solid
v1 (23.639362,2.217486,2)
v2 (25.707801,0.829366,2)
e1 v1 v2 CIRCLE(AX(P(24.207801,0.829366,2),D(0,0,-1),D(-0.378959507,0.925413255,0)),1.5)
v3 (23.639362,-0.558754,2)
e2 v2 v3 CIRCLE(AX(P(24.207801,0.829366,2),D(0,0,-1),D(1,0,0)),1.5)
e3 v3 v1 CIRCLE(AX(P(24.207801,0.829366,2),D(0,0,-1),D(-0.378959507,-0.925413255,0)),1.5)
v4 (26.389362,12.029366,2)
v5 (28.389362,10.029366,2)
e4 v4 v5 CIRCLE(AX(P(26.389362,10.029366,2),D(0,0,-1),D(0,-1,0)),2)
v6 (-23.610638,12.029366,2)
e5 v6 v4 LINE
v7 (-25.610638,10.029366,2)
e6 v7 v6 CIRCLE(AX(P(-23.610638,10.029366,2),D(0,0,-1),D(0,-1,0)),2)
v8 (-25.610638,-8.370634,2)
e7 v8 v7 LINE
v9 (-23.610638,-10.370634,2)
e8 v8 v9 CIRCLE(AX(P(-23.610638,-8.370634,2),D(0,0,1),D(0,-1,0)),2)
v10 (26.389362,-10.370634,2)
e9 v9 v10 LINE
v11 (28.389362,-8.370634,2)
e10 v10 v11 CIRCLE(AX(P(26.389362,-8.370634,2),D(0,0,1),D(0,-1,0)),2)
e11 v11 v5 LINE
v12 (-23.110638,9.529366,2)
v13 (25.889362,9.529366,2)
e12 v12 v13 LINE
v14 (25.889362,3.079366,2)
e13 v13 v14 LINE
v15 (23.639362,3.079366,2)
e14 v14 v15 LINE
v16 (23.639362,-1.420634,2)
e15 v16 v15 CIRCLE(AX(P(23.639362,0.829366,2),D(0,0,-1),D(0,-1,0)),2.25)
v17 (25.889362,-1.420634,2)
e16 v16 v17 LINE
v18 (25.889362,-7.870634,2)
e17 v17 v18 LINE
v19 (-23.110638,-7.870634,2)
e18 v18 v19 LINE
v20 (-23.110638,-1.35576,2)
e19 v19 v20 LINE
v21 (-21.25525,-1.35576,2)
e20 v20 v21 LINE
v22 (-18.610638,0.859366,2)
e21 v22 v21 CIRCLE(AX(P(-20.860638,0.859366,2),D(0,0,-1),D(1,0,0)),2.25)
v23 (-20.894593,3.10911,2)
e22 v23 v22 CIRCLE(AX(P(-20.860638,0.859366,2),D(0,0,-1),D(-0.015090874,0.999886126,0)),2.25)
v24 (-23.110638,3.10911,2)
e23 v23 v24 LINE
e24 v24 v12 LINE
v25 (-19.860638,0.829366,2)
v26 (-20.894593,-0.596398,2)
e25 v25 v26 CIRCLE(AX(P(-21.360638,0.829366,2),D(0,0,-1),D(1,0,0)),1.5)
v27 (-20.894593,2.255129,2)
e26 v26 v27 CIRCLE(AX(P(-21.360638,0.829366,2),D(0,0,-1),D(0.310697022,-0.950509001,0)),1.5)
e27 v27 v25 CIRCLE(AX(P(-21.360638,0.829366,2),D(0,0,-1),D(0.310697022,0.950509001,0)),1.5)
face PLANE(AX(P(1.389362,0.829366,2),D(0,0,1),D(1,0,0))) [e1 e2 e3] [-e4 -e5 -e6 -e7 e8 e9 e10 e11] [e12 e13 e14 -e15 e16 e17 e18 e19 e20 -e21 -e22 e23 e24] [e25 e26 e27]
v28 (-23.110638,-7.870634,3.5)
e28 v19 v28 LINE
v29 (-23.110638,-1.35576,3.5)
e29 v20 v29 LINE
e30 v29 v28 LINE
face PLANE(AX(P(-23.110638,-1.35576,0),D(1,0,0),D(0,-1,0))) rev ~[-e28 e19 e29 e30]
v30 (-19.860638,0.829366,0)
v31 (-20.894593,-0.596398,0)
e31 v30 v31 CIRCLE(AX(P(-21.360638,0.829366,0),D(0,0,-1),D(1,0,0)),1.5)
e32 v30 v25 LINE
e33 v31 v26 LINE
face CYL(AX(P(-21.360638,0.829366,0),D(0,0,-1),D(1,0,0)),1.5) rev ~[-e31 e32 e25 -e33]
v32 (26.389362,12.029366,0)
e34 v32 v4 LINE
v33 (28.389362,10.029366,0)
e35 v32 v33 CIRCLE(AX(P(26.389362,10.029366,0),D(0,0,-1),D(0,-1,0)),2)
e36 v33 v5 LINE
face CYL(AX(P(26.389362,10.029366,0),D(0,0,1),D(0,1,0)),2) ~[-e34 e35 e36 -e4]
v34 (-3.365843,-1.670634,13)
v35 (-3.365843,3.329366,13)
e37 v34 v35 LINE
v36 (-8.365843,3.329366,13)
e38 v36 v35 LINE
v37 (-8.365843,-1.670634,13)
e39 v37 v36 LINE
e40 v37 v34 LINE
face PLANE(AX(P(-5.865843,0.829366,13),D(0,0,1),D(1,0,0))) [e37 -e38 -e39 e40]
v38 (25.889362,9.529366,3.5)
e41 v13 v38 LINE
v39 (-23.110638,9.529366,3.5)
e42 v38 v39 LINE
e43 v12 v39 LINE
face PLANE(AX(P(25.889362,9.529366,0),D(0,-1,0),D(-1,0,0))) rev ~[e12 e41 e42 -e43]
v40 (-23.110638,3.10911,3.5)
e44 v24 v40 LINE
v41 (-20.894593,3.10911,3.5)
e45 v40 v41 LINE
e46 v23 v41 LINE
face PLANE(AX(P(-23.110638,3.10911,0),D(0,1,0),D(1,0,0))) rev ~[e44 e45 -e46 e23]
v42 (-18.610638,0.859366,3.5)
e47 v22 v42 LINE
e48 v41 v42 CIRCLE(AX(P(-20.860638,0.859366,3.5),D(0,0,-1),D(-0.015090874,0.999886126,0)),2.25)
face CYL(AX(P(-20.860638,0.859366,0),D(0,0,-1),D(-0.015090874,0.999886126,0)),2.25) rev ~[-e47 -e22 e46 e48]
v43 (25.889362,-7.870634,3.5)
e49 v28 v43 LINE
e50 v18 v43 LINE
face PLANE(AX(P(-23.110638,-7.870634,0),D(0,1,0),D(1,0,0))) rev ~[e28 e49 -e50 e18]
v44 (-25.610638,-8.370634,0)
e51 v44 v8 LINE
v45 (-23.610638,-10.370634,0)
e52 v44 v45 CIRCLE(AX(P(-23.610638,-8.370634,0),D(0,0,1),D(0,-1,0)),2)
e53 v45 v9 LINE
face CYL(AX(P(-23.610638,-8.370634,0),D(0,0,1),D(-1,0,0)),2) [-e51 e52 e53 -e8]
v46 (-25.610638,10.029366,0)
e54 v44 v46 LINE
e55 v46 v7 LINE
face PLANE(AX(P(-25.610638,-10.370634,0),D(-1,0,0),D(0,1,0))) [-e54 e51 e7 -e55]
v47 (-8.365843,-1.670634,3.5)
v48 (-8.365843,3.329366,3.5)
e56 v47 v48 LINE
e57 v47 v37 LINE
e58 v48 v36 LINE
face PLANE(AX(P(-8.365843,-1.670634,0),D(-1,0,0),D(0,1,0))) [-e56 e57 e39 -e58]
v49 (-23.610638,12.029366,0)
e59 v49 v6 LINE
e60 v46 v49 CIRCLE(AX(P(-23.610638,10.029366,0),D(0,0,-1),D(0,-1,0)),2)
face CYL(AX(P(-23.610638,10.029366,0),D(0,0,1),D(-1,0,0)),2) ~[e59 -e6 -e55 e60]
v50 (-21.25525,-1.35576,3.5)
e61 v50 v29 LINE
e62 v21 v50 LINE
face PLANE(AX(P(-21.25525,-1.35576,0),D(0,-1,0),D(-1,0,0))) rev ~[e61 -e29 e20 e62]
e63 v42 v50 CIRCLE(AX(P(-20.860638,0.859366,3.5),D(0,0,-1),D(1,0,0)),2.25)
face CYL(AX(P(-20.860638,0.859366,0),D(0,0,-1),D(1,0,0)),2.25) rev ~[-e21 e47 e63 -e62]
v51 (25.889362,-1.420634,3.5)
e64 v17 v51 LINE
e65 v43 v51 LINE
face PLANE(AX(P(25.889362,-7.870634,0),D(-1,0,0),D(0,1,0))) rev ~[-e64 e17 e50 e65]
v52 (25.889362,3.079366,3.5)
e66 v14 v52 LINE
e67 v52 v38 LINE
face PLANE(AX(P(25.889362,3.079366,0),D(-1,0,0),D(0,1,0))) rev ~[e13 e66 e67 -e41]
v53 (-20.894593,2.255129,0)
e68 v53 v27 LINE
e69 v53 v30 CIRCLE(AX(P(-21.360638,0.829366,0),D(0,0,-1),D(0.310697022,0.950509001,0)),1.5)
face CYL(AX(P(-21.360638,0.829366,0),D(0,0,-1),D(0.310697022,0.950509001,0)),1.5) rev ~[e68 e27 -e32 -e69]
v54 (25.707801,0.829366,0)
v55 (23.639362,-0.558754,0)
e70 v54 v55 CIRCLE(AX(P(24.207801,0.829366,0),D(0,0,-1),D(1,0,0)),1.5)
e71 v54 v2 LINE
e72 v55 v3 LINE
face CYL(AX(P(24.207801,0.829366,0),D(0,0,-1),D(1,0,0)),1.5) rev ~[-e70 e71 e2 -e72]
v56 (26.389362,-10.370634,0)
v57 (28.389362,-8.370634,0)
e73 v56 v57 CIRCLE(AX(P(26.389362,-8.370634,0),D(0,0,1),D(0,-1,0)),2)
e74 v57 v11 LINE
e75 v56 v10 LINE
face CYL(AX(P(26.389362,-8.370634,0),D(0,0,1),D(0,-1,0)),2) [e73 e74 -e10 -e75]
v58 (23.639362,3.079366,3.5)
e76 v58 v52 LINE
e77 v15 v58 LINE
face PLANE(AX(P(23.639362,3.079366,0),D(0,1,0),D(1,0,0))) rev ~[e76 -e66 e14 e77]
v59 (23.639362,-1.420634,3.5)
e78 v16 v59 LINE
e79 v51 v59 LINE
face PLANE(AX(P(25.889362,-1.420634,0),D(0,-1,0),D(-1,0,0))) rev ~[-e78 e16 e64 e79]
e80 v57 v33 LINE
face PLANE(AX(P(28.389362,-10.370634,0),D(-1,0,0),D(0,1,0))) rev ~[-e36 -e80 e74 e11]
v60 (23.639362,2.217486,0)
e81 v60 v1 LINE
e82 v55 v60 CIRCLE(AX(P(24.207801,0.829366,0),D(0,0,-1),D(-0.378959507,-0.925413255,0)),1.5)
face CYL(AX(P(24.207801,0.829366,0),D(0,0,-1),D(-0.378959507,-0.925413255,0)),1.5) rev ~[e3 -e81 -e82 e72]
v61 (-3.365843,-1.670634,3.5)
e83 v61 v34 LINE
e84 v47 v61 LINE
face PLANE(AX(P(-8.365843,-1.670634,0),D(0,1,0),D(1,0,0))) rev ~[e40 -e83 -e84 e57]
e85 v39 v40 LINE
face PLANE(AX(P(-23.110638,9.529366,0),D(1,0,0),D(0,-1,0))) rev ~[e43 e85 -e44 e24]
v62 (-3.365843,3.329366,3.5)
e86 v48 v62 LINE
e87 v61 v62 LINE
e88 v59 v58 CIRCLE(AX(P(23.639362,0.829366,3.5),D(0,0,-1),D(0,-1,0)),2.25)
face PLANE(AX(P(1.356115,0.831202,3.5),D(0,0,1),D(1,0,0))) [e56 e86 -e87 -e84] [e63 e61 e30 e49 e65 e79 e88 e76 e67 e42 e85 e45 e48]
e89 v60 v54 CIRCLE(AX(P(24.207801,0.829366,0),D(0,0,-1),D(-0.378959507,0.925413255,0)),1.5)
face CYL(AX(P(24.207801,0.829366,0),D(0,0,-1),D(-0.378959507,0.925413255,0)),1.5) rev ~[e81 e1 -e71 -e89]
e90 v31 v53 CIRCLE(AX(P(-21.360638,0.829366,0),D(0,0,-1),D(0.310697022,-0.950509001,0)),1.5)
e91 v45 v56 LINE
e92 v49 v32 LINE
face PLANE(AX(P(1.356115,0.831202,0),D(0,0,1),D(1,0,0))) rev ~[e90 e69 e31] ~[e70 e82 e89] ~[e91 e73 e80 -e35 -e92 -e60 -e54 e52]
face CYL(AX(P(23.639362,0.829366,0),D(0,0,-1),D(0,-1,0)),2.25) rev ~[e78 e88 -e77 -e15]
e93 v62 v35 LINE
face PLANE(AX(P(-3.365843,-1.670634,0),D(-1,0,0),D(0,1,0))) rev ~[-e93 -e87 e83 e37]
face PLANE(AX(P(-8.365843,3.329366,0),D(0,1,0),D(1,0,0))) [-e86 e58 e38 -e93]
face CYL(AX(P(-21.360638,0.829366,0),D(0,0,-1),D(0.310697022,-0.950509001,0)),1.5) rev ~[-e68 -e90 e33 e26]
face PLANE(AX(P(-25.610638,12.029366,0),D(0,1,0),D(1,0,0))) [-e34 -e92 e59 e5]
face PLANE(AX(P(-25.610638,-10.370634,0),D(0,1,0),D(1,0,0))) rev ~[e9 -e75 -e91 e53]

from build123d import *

# Parameters (mm, degrees)
F0_W     = 54
F0_H     = 22.4
F0_W_2   = 5
F0_H_2   = 5
F1_DEPTH = 2
F2_DEPTH = 13
F3_DEPTH = 3.5
F4_R     = 2


# Not quite as in the source:
# - a feature names something its author has since deleted; it is built from what else it names


with BuildPart() as f1:
    # F0 (on Top) → F1 (new body)
    with BuildSketch(Plane.XY):
        with Locations((1.3893617413, 0.829365923)):
            Rectangle(F0_W, F0_H)
        Polygon((-23.1106382587, 3.1091097071), (-23.1106382587, 9.529365923), (25.8893617413, 9.529365923), (25.8893617413, 3.079365923), (25.8893617413, 0.829365923), (25.8893617413, -1.420634077), (25.8893617413, -7.870634077), (-23.1106382587, -7.870634077), (-23.1106382587, -1.3557597995), (-23.1106382587, 0.859365923), align=None, mode=Mode.SUBTRACT)
        with BuildLine():
            Line((25.8893617413, 9.529365923), (-23.1106382587, 9.529365923))
            Line((-23.1106382587, 9.529365923), (-23.1106382587, 3.1091097071))
            Line((-23.1106382587, 3.1091097071), (-20.8945927259, 3.1091097071))
            ThreePointArc((-20.8945927259, 3.1091097071), (-19.2816983534, 2.4623159458), (-18.6106382587, 0.859365923))
            ThreePointArc((-18.6106382587, 0.859365923), (-19.4158848712, -0.8655073041), (-21.2552495026, -1.3557597995))
            Line((-21.2552495026, -1.3557597995), (-23.1106382587, -1.3557597995))
            Line((-23.1106382587, -1.3557597995), (-23.1106382587, -7.870634077))
            Line((-23.1106382587, -7.870634077), (25.8893617413, -7.870634077))
            Line((25.8893617413, -7.870634077), (25.8893617413, -1.420634077))
            Line((25.8893617413, -1.420634077), (23.6393617413, -1.420634077))
            ThreePointArc((23.6393617413, -1.420634077), (21.3893617413, 0.829365923), (23.6393617413, 3.079365923))
            Line((23.6393617413, 3.079365923), (25.8893617413, 3.079365923))
            Line((25.8893617413, 3.079365923), (25.8893617413, 9.529365923))
        make_face()
        with Locations((-5.8658428788, 0.829365923)):
            Rectangle(F0_W_2, F0_H_2, mode=Mode.SUBTRACT)
        with BuildLine():
            Line((-20.8945927259, 3.1091097071), (-23.1106382587, 3.1091097071))
            Line((-23.1106382587, 3.1091097071), (-23.1106382587, 0.859365923))
            ThreePointArc((-23.1106382587, 0.859365923), (-22.4635882815, 2.4383058282), (-20.8945927259, 3.1091097071))
        make_face()
        with BuildLine():
            Line((25.8893617413, 0.829365923), (25.8893617413, 3.079365923))
            Line((25.8893617413, 3.079365923), (23.6393617413, 3.079365923))
            ThreePointArc((23.6393617413, 3.079365923), (25.230351999, 2.4203561806), (25.8893617413, 0.829365923))
        make_face()
        with BuildLine():
            ThreePointArc((-21.2552495026, -1.3557597995), (-22.5855114857, -0.5853874645), (-23.1106382587, 0.859365923))
            Line((-23.1106382587, 0.859365923), (-23.1106382587, -1.3557597995))
            Line((-23.1106382587, -1.3557597995), (-21.2552495026, -1.3557597995))
        make_face()
        with BuildLine():
            ThreePointArc((-20.8945927259, 3.1091097071), (-22.4635882815, 2.4383058282), (-23.1106382587, 0.859365923))
            ThreePointArc((-23.1106382587, 0.859365923), (-22.5855114857, -0.5853874645), (-21.2552495026, -1.3557597995))
            Line((-21.2552495026, -1.3557597995), (-20.8945927259, -1.3557597995))
            Line((-20.8945927259, -1.3557597995), (-20.8945927259, -0.5963975782))
            ThreePointArc((-20.8945927259, -0.5963975782), (-22.8606382587, 0.829365923), (-20.8945927259, 2.2551294242))
            Line((-20.8945927259, 2.2551294242), (-20.8945927259, 3.1091097071))
        make_face()
        with BuildLine():
            ThreePointArc((-18.6106382587, 0.859365923), (-19.2816983534, 2.4623159458), (-20.8945927259, 3.1091097071))
            Line((-20.8945927259, 3.1091097071), (-20.8945927259, 2.2551294242))
            ThreePointArc((-20.8945927259, 2.2551294242), (-20.1463342813, 1.7099713115), (-19.8606382587, 0.829365923))
            ThreePointArc((-19.8606382587, 0.829365923), (-20.1463342813, -0.0512394656), (-20.8945927259, -0.5963975782))
            Line((-20.8945927259, -0.5963975782), (-20.8945927259, -1.3557597995))
            Line((-20.8945927259, -1.3557597995), (-21.2552495026, -1.3557597995))
            ThreePointArc((-21.2552495026, -1.3557597995), (-19.4158848712, -0.8655073041), (-18.6106382587, 0.859365923))
        make_face()
        with BuildLine():
            ThreePointArc((23.6393617413, -1.420634077), (25.230351999, -0.7616243347), (25.8893617413, 0.829365923))
            ThreePointArc((25.8893617413, 0.829365923), (25.230351999, 2.4203561806), (23.6393617413, 3.079365923))
            Line((23.6393617413, 3.079365923), (23.6393617413, 2.2174858052))
            ThreePointArc((23.6393617413, 2.2174858052), (25.043666155, 2.0748896863), (25.7078010014, 0.829365923))
            ThreePointArc((25.7078010014, 0.829365923), (25.043666155, -0.4161578404), (23.6393617413, -0.5587539593))
            Line((23.6393617413, -0.5587539593), (23.6393617413, -1.420634077))
        make_face()
        with BuildLine():
            Line((25.8893617413, -1.420634077), (25.8893617413, 0.829365923))
            ThreePointArc((25.8893617413, 0.829365923), (25.230351999, -0.7616243347), (23.6393617413, -1.420634077))
            Line((23.6393617413, -1.420634077), (25.8893617413, -1.420634077))
        make_face()
        with BuildLine():
            Line((23.6393617413, 2.2174858052), (23.6393617413, 3.079365923))
            ThreePointArc((23.6393617413, 3.079365923), (21.3893617413, 0.829365923), (23.6393617413, -1.420634077))
            Line((23.6393617413, -1.420634077), (23.6393617413, -0.5587539593))
            ThreePointArc((23.6393617413, -0.5587539593), (22.7078010014, 0.829365923), (23.6393617413, 2.2174858052))
        make_face()
        with Locations((-5.8658428788, 0.829365923)):
            Rectangle(F0_W_2, F0_H_2)
    extrude(amount=F1_DEPTH)

    # F0 (on Top) → F2 (join)
    with BuildSketch(Plane.XY):
        with Locations((-5.8658428788, 0.829365923)):
            Rectangle(F0_W_2, F0_H_2)
    extrude(amount=F2_DEPTH)

    # F0 (on Top) → F3 (join)
    with BuildSketch(Plane.XY):
        with BuildLine():
            Line((25.8893617413, 9.529365923), (-23.1106382587, 9.529365923))
            Line((-23.1106382587, 9.529365923), (-23.1106382587, 3.1091097071))
            Line((-23.1106382587, 3.1091097071), (-20.8945927259, 3.1091097071))
            ThreePointArc((-20.8945927259, 3.1091097071), (-19.2816983534, 2.4623159458), (-18.6106382587, 0.859365923))
            ThreePointArc((-18.6106382587, 0.859365923), (-19.4158848712, -0.8655073041), (-21.2552495026, -1.3557597995))
            Line((-21.2552495026, -1.3557597995), (-23.1106382587, -1.3557597995))
            Line((-23.1106382587, -1.3557597995), (-23.1106382587, -7.870634077))
            Line((-23.1106382587, -7.870634077), (25.8893617413, -7.870634077))
            Line((25.8893617413, -7.870634077), (25.8893617413, -1.420634077))
            Line((25.8893617413, -1.420634077), (23.6393617413, -1.420634077))
            ThreePointArc((23.6393617413, -1.420634077), (21.3893617413, 0.829365923), (23.6393617413, 3.079365923))
            Line((23.6393617413, 3.079365923), (25.8893617413, 3.079365923))
            Line((25.8893617413, 3.079365923), (25.8893617413, 9.529365923))
        make_face()
        with Locations((-5.8658428788, 0.829365923)):
            Rectangle(F0_W_2, F0_H_2, mode=Mode.SUBTRACT)
        with Locations((-5.8658428788, 0.829365923)):
            Rectangle(F0_W_2, F0_H_2)
    extrude(amount=F3_DEPTH)

    # F4
    f4_edges = [f1.edges().sort_by_distance(p)[0] for p in [
        (-25.610638, 12.029366, 1),
        (-25.610638, -10.370634, 1),
        (28.389362, 12.029366, 1),
        (28.389362, -10.370634, 1),
    ]]
    fillet(f4_edges, radius=F4_R)


solid = f1.part
